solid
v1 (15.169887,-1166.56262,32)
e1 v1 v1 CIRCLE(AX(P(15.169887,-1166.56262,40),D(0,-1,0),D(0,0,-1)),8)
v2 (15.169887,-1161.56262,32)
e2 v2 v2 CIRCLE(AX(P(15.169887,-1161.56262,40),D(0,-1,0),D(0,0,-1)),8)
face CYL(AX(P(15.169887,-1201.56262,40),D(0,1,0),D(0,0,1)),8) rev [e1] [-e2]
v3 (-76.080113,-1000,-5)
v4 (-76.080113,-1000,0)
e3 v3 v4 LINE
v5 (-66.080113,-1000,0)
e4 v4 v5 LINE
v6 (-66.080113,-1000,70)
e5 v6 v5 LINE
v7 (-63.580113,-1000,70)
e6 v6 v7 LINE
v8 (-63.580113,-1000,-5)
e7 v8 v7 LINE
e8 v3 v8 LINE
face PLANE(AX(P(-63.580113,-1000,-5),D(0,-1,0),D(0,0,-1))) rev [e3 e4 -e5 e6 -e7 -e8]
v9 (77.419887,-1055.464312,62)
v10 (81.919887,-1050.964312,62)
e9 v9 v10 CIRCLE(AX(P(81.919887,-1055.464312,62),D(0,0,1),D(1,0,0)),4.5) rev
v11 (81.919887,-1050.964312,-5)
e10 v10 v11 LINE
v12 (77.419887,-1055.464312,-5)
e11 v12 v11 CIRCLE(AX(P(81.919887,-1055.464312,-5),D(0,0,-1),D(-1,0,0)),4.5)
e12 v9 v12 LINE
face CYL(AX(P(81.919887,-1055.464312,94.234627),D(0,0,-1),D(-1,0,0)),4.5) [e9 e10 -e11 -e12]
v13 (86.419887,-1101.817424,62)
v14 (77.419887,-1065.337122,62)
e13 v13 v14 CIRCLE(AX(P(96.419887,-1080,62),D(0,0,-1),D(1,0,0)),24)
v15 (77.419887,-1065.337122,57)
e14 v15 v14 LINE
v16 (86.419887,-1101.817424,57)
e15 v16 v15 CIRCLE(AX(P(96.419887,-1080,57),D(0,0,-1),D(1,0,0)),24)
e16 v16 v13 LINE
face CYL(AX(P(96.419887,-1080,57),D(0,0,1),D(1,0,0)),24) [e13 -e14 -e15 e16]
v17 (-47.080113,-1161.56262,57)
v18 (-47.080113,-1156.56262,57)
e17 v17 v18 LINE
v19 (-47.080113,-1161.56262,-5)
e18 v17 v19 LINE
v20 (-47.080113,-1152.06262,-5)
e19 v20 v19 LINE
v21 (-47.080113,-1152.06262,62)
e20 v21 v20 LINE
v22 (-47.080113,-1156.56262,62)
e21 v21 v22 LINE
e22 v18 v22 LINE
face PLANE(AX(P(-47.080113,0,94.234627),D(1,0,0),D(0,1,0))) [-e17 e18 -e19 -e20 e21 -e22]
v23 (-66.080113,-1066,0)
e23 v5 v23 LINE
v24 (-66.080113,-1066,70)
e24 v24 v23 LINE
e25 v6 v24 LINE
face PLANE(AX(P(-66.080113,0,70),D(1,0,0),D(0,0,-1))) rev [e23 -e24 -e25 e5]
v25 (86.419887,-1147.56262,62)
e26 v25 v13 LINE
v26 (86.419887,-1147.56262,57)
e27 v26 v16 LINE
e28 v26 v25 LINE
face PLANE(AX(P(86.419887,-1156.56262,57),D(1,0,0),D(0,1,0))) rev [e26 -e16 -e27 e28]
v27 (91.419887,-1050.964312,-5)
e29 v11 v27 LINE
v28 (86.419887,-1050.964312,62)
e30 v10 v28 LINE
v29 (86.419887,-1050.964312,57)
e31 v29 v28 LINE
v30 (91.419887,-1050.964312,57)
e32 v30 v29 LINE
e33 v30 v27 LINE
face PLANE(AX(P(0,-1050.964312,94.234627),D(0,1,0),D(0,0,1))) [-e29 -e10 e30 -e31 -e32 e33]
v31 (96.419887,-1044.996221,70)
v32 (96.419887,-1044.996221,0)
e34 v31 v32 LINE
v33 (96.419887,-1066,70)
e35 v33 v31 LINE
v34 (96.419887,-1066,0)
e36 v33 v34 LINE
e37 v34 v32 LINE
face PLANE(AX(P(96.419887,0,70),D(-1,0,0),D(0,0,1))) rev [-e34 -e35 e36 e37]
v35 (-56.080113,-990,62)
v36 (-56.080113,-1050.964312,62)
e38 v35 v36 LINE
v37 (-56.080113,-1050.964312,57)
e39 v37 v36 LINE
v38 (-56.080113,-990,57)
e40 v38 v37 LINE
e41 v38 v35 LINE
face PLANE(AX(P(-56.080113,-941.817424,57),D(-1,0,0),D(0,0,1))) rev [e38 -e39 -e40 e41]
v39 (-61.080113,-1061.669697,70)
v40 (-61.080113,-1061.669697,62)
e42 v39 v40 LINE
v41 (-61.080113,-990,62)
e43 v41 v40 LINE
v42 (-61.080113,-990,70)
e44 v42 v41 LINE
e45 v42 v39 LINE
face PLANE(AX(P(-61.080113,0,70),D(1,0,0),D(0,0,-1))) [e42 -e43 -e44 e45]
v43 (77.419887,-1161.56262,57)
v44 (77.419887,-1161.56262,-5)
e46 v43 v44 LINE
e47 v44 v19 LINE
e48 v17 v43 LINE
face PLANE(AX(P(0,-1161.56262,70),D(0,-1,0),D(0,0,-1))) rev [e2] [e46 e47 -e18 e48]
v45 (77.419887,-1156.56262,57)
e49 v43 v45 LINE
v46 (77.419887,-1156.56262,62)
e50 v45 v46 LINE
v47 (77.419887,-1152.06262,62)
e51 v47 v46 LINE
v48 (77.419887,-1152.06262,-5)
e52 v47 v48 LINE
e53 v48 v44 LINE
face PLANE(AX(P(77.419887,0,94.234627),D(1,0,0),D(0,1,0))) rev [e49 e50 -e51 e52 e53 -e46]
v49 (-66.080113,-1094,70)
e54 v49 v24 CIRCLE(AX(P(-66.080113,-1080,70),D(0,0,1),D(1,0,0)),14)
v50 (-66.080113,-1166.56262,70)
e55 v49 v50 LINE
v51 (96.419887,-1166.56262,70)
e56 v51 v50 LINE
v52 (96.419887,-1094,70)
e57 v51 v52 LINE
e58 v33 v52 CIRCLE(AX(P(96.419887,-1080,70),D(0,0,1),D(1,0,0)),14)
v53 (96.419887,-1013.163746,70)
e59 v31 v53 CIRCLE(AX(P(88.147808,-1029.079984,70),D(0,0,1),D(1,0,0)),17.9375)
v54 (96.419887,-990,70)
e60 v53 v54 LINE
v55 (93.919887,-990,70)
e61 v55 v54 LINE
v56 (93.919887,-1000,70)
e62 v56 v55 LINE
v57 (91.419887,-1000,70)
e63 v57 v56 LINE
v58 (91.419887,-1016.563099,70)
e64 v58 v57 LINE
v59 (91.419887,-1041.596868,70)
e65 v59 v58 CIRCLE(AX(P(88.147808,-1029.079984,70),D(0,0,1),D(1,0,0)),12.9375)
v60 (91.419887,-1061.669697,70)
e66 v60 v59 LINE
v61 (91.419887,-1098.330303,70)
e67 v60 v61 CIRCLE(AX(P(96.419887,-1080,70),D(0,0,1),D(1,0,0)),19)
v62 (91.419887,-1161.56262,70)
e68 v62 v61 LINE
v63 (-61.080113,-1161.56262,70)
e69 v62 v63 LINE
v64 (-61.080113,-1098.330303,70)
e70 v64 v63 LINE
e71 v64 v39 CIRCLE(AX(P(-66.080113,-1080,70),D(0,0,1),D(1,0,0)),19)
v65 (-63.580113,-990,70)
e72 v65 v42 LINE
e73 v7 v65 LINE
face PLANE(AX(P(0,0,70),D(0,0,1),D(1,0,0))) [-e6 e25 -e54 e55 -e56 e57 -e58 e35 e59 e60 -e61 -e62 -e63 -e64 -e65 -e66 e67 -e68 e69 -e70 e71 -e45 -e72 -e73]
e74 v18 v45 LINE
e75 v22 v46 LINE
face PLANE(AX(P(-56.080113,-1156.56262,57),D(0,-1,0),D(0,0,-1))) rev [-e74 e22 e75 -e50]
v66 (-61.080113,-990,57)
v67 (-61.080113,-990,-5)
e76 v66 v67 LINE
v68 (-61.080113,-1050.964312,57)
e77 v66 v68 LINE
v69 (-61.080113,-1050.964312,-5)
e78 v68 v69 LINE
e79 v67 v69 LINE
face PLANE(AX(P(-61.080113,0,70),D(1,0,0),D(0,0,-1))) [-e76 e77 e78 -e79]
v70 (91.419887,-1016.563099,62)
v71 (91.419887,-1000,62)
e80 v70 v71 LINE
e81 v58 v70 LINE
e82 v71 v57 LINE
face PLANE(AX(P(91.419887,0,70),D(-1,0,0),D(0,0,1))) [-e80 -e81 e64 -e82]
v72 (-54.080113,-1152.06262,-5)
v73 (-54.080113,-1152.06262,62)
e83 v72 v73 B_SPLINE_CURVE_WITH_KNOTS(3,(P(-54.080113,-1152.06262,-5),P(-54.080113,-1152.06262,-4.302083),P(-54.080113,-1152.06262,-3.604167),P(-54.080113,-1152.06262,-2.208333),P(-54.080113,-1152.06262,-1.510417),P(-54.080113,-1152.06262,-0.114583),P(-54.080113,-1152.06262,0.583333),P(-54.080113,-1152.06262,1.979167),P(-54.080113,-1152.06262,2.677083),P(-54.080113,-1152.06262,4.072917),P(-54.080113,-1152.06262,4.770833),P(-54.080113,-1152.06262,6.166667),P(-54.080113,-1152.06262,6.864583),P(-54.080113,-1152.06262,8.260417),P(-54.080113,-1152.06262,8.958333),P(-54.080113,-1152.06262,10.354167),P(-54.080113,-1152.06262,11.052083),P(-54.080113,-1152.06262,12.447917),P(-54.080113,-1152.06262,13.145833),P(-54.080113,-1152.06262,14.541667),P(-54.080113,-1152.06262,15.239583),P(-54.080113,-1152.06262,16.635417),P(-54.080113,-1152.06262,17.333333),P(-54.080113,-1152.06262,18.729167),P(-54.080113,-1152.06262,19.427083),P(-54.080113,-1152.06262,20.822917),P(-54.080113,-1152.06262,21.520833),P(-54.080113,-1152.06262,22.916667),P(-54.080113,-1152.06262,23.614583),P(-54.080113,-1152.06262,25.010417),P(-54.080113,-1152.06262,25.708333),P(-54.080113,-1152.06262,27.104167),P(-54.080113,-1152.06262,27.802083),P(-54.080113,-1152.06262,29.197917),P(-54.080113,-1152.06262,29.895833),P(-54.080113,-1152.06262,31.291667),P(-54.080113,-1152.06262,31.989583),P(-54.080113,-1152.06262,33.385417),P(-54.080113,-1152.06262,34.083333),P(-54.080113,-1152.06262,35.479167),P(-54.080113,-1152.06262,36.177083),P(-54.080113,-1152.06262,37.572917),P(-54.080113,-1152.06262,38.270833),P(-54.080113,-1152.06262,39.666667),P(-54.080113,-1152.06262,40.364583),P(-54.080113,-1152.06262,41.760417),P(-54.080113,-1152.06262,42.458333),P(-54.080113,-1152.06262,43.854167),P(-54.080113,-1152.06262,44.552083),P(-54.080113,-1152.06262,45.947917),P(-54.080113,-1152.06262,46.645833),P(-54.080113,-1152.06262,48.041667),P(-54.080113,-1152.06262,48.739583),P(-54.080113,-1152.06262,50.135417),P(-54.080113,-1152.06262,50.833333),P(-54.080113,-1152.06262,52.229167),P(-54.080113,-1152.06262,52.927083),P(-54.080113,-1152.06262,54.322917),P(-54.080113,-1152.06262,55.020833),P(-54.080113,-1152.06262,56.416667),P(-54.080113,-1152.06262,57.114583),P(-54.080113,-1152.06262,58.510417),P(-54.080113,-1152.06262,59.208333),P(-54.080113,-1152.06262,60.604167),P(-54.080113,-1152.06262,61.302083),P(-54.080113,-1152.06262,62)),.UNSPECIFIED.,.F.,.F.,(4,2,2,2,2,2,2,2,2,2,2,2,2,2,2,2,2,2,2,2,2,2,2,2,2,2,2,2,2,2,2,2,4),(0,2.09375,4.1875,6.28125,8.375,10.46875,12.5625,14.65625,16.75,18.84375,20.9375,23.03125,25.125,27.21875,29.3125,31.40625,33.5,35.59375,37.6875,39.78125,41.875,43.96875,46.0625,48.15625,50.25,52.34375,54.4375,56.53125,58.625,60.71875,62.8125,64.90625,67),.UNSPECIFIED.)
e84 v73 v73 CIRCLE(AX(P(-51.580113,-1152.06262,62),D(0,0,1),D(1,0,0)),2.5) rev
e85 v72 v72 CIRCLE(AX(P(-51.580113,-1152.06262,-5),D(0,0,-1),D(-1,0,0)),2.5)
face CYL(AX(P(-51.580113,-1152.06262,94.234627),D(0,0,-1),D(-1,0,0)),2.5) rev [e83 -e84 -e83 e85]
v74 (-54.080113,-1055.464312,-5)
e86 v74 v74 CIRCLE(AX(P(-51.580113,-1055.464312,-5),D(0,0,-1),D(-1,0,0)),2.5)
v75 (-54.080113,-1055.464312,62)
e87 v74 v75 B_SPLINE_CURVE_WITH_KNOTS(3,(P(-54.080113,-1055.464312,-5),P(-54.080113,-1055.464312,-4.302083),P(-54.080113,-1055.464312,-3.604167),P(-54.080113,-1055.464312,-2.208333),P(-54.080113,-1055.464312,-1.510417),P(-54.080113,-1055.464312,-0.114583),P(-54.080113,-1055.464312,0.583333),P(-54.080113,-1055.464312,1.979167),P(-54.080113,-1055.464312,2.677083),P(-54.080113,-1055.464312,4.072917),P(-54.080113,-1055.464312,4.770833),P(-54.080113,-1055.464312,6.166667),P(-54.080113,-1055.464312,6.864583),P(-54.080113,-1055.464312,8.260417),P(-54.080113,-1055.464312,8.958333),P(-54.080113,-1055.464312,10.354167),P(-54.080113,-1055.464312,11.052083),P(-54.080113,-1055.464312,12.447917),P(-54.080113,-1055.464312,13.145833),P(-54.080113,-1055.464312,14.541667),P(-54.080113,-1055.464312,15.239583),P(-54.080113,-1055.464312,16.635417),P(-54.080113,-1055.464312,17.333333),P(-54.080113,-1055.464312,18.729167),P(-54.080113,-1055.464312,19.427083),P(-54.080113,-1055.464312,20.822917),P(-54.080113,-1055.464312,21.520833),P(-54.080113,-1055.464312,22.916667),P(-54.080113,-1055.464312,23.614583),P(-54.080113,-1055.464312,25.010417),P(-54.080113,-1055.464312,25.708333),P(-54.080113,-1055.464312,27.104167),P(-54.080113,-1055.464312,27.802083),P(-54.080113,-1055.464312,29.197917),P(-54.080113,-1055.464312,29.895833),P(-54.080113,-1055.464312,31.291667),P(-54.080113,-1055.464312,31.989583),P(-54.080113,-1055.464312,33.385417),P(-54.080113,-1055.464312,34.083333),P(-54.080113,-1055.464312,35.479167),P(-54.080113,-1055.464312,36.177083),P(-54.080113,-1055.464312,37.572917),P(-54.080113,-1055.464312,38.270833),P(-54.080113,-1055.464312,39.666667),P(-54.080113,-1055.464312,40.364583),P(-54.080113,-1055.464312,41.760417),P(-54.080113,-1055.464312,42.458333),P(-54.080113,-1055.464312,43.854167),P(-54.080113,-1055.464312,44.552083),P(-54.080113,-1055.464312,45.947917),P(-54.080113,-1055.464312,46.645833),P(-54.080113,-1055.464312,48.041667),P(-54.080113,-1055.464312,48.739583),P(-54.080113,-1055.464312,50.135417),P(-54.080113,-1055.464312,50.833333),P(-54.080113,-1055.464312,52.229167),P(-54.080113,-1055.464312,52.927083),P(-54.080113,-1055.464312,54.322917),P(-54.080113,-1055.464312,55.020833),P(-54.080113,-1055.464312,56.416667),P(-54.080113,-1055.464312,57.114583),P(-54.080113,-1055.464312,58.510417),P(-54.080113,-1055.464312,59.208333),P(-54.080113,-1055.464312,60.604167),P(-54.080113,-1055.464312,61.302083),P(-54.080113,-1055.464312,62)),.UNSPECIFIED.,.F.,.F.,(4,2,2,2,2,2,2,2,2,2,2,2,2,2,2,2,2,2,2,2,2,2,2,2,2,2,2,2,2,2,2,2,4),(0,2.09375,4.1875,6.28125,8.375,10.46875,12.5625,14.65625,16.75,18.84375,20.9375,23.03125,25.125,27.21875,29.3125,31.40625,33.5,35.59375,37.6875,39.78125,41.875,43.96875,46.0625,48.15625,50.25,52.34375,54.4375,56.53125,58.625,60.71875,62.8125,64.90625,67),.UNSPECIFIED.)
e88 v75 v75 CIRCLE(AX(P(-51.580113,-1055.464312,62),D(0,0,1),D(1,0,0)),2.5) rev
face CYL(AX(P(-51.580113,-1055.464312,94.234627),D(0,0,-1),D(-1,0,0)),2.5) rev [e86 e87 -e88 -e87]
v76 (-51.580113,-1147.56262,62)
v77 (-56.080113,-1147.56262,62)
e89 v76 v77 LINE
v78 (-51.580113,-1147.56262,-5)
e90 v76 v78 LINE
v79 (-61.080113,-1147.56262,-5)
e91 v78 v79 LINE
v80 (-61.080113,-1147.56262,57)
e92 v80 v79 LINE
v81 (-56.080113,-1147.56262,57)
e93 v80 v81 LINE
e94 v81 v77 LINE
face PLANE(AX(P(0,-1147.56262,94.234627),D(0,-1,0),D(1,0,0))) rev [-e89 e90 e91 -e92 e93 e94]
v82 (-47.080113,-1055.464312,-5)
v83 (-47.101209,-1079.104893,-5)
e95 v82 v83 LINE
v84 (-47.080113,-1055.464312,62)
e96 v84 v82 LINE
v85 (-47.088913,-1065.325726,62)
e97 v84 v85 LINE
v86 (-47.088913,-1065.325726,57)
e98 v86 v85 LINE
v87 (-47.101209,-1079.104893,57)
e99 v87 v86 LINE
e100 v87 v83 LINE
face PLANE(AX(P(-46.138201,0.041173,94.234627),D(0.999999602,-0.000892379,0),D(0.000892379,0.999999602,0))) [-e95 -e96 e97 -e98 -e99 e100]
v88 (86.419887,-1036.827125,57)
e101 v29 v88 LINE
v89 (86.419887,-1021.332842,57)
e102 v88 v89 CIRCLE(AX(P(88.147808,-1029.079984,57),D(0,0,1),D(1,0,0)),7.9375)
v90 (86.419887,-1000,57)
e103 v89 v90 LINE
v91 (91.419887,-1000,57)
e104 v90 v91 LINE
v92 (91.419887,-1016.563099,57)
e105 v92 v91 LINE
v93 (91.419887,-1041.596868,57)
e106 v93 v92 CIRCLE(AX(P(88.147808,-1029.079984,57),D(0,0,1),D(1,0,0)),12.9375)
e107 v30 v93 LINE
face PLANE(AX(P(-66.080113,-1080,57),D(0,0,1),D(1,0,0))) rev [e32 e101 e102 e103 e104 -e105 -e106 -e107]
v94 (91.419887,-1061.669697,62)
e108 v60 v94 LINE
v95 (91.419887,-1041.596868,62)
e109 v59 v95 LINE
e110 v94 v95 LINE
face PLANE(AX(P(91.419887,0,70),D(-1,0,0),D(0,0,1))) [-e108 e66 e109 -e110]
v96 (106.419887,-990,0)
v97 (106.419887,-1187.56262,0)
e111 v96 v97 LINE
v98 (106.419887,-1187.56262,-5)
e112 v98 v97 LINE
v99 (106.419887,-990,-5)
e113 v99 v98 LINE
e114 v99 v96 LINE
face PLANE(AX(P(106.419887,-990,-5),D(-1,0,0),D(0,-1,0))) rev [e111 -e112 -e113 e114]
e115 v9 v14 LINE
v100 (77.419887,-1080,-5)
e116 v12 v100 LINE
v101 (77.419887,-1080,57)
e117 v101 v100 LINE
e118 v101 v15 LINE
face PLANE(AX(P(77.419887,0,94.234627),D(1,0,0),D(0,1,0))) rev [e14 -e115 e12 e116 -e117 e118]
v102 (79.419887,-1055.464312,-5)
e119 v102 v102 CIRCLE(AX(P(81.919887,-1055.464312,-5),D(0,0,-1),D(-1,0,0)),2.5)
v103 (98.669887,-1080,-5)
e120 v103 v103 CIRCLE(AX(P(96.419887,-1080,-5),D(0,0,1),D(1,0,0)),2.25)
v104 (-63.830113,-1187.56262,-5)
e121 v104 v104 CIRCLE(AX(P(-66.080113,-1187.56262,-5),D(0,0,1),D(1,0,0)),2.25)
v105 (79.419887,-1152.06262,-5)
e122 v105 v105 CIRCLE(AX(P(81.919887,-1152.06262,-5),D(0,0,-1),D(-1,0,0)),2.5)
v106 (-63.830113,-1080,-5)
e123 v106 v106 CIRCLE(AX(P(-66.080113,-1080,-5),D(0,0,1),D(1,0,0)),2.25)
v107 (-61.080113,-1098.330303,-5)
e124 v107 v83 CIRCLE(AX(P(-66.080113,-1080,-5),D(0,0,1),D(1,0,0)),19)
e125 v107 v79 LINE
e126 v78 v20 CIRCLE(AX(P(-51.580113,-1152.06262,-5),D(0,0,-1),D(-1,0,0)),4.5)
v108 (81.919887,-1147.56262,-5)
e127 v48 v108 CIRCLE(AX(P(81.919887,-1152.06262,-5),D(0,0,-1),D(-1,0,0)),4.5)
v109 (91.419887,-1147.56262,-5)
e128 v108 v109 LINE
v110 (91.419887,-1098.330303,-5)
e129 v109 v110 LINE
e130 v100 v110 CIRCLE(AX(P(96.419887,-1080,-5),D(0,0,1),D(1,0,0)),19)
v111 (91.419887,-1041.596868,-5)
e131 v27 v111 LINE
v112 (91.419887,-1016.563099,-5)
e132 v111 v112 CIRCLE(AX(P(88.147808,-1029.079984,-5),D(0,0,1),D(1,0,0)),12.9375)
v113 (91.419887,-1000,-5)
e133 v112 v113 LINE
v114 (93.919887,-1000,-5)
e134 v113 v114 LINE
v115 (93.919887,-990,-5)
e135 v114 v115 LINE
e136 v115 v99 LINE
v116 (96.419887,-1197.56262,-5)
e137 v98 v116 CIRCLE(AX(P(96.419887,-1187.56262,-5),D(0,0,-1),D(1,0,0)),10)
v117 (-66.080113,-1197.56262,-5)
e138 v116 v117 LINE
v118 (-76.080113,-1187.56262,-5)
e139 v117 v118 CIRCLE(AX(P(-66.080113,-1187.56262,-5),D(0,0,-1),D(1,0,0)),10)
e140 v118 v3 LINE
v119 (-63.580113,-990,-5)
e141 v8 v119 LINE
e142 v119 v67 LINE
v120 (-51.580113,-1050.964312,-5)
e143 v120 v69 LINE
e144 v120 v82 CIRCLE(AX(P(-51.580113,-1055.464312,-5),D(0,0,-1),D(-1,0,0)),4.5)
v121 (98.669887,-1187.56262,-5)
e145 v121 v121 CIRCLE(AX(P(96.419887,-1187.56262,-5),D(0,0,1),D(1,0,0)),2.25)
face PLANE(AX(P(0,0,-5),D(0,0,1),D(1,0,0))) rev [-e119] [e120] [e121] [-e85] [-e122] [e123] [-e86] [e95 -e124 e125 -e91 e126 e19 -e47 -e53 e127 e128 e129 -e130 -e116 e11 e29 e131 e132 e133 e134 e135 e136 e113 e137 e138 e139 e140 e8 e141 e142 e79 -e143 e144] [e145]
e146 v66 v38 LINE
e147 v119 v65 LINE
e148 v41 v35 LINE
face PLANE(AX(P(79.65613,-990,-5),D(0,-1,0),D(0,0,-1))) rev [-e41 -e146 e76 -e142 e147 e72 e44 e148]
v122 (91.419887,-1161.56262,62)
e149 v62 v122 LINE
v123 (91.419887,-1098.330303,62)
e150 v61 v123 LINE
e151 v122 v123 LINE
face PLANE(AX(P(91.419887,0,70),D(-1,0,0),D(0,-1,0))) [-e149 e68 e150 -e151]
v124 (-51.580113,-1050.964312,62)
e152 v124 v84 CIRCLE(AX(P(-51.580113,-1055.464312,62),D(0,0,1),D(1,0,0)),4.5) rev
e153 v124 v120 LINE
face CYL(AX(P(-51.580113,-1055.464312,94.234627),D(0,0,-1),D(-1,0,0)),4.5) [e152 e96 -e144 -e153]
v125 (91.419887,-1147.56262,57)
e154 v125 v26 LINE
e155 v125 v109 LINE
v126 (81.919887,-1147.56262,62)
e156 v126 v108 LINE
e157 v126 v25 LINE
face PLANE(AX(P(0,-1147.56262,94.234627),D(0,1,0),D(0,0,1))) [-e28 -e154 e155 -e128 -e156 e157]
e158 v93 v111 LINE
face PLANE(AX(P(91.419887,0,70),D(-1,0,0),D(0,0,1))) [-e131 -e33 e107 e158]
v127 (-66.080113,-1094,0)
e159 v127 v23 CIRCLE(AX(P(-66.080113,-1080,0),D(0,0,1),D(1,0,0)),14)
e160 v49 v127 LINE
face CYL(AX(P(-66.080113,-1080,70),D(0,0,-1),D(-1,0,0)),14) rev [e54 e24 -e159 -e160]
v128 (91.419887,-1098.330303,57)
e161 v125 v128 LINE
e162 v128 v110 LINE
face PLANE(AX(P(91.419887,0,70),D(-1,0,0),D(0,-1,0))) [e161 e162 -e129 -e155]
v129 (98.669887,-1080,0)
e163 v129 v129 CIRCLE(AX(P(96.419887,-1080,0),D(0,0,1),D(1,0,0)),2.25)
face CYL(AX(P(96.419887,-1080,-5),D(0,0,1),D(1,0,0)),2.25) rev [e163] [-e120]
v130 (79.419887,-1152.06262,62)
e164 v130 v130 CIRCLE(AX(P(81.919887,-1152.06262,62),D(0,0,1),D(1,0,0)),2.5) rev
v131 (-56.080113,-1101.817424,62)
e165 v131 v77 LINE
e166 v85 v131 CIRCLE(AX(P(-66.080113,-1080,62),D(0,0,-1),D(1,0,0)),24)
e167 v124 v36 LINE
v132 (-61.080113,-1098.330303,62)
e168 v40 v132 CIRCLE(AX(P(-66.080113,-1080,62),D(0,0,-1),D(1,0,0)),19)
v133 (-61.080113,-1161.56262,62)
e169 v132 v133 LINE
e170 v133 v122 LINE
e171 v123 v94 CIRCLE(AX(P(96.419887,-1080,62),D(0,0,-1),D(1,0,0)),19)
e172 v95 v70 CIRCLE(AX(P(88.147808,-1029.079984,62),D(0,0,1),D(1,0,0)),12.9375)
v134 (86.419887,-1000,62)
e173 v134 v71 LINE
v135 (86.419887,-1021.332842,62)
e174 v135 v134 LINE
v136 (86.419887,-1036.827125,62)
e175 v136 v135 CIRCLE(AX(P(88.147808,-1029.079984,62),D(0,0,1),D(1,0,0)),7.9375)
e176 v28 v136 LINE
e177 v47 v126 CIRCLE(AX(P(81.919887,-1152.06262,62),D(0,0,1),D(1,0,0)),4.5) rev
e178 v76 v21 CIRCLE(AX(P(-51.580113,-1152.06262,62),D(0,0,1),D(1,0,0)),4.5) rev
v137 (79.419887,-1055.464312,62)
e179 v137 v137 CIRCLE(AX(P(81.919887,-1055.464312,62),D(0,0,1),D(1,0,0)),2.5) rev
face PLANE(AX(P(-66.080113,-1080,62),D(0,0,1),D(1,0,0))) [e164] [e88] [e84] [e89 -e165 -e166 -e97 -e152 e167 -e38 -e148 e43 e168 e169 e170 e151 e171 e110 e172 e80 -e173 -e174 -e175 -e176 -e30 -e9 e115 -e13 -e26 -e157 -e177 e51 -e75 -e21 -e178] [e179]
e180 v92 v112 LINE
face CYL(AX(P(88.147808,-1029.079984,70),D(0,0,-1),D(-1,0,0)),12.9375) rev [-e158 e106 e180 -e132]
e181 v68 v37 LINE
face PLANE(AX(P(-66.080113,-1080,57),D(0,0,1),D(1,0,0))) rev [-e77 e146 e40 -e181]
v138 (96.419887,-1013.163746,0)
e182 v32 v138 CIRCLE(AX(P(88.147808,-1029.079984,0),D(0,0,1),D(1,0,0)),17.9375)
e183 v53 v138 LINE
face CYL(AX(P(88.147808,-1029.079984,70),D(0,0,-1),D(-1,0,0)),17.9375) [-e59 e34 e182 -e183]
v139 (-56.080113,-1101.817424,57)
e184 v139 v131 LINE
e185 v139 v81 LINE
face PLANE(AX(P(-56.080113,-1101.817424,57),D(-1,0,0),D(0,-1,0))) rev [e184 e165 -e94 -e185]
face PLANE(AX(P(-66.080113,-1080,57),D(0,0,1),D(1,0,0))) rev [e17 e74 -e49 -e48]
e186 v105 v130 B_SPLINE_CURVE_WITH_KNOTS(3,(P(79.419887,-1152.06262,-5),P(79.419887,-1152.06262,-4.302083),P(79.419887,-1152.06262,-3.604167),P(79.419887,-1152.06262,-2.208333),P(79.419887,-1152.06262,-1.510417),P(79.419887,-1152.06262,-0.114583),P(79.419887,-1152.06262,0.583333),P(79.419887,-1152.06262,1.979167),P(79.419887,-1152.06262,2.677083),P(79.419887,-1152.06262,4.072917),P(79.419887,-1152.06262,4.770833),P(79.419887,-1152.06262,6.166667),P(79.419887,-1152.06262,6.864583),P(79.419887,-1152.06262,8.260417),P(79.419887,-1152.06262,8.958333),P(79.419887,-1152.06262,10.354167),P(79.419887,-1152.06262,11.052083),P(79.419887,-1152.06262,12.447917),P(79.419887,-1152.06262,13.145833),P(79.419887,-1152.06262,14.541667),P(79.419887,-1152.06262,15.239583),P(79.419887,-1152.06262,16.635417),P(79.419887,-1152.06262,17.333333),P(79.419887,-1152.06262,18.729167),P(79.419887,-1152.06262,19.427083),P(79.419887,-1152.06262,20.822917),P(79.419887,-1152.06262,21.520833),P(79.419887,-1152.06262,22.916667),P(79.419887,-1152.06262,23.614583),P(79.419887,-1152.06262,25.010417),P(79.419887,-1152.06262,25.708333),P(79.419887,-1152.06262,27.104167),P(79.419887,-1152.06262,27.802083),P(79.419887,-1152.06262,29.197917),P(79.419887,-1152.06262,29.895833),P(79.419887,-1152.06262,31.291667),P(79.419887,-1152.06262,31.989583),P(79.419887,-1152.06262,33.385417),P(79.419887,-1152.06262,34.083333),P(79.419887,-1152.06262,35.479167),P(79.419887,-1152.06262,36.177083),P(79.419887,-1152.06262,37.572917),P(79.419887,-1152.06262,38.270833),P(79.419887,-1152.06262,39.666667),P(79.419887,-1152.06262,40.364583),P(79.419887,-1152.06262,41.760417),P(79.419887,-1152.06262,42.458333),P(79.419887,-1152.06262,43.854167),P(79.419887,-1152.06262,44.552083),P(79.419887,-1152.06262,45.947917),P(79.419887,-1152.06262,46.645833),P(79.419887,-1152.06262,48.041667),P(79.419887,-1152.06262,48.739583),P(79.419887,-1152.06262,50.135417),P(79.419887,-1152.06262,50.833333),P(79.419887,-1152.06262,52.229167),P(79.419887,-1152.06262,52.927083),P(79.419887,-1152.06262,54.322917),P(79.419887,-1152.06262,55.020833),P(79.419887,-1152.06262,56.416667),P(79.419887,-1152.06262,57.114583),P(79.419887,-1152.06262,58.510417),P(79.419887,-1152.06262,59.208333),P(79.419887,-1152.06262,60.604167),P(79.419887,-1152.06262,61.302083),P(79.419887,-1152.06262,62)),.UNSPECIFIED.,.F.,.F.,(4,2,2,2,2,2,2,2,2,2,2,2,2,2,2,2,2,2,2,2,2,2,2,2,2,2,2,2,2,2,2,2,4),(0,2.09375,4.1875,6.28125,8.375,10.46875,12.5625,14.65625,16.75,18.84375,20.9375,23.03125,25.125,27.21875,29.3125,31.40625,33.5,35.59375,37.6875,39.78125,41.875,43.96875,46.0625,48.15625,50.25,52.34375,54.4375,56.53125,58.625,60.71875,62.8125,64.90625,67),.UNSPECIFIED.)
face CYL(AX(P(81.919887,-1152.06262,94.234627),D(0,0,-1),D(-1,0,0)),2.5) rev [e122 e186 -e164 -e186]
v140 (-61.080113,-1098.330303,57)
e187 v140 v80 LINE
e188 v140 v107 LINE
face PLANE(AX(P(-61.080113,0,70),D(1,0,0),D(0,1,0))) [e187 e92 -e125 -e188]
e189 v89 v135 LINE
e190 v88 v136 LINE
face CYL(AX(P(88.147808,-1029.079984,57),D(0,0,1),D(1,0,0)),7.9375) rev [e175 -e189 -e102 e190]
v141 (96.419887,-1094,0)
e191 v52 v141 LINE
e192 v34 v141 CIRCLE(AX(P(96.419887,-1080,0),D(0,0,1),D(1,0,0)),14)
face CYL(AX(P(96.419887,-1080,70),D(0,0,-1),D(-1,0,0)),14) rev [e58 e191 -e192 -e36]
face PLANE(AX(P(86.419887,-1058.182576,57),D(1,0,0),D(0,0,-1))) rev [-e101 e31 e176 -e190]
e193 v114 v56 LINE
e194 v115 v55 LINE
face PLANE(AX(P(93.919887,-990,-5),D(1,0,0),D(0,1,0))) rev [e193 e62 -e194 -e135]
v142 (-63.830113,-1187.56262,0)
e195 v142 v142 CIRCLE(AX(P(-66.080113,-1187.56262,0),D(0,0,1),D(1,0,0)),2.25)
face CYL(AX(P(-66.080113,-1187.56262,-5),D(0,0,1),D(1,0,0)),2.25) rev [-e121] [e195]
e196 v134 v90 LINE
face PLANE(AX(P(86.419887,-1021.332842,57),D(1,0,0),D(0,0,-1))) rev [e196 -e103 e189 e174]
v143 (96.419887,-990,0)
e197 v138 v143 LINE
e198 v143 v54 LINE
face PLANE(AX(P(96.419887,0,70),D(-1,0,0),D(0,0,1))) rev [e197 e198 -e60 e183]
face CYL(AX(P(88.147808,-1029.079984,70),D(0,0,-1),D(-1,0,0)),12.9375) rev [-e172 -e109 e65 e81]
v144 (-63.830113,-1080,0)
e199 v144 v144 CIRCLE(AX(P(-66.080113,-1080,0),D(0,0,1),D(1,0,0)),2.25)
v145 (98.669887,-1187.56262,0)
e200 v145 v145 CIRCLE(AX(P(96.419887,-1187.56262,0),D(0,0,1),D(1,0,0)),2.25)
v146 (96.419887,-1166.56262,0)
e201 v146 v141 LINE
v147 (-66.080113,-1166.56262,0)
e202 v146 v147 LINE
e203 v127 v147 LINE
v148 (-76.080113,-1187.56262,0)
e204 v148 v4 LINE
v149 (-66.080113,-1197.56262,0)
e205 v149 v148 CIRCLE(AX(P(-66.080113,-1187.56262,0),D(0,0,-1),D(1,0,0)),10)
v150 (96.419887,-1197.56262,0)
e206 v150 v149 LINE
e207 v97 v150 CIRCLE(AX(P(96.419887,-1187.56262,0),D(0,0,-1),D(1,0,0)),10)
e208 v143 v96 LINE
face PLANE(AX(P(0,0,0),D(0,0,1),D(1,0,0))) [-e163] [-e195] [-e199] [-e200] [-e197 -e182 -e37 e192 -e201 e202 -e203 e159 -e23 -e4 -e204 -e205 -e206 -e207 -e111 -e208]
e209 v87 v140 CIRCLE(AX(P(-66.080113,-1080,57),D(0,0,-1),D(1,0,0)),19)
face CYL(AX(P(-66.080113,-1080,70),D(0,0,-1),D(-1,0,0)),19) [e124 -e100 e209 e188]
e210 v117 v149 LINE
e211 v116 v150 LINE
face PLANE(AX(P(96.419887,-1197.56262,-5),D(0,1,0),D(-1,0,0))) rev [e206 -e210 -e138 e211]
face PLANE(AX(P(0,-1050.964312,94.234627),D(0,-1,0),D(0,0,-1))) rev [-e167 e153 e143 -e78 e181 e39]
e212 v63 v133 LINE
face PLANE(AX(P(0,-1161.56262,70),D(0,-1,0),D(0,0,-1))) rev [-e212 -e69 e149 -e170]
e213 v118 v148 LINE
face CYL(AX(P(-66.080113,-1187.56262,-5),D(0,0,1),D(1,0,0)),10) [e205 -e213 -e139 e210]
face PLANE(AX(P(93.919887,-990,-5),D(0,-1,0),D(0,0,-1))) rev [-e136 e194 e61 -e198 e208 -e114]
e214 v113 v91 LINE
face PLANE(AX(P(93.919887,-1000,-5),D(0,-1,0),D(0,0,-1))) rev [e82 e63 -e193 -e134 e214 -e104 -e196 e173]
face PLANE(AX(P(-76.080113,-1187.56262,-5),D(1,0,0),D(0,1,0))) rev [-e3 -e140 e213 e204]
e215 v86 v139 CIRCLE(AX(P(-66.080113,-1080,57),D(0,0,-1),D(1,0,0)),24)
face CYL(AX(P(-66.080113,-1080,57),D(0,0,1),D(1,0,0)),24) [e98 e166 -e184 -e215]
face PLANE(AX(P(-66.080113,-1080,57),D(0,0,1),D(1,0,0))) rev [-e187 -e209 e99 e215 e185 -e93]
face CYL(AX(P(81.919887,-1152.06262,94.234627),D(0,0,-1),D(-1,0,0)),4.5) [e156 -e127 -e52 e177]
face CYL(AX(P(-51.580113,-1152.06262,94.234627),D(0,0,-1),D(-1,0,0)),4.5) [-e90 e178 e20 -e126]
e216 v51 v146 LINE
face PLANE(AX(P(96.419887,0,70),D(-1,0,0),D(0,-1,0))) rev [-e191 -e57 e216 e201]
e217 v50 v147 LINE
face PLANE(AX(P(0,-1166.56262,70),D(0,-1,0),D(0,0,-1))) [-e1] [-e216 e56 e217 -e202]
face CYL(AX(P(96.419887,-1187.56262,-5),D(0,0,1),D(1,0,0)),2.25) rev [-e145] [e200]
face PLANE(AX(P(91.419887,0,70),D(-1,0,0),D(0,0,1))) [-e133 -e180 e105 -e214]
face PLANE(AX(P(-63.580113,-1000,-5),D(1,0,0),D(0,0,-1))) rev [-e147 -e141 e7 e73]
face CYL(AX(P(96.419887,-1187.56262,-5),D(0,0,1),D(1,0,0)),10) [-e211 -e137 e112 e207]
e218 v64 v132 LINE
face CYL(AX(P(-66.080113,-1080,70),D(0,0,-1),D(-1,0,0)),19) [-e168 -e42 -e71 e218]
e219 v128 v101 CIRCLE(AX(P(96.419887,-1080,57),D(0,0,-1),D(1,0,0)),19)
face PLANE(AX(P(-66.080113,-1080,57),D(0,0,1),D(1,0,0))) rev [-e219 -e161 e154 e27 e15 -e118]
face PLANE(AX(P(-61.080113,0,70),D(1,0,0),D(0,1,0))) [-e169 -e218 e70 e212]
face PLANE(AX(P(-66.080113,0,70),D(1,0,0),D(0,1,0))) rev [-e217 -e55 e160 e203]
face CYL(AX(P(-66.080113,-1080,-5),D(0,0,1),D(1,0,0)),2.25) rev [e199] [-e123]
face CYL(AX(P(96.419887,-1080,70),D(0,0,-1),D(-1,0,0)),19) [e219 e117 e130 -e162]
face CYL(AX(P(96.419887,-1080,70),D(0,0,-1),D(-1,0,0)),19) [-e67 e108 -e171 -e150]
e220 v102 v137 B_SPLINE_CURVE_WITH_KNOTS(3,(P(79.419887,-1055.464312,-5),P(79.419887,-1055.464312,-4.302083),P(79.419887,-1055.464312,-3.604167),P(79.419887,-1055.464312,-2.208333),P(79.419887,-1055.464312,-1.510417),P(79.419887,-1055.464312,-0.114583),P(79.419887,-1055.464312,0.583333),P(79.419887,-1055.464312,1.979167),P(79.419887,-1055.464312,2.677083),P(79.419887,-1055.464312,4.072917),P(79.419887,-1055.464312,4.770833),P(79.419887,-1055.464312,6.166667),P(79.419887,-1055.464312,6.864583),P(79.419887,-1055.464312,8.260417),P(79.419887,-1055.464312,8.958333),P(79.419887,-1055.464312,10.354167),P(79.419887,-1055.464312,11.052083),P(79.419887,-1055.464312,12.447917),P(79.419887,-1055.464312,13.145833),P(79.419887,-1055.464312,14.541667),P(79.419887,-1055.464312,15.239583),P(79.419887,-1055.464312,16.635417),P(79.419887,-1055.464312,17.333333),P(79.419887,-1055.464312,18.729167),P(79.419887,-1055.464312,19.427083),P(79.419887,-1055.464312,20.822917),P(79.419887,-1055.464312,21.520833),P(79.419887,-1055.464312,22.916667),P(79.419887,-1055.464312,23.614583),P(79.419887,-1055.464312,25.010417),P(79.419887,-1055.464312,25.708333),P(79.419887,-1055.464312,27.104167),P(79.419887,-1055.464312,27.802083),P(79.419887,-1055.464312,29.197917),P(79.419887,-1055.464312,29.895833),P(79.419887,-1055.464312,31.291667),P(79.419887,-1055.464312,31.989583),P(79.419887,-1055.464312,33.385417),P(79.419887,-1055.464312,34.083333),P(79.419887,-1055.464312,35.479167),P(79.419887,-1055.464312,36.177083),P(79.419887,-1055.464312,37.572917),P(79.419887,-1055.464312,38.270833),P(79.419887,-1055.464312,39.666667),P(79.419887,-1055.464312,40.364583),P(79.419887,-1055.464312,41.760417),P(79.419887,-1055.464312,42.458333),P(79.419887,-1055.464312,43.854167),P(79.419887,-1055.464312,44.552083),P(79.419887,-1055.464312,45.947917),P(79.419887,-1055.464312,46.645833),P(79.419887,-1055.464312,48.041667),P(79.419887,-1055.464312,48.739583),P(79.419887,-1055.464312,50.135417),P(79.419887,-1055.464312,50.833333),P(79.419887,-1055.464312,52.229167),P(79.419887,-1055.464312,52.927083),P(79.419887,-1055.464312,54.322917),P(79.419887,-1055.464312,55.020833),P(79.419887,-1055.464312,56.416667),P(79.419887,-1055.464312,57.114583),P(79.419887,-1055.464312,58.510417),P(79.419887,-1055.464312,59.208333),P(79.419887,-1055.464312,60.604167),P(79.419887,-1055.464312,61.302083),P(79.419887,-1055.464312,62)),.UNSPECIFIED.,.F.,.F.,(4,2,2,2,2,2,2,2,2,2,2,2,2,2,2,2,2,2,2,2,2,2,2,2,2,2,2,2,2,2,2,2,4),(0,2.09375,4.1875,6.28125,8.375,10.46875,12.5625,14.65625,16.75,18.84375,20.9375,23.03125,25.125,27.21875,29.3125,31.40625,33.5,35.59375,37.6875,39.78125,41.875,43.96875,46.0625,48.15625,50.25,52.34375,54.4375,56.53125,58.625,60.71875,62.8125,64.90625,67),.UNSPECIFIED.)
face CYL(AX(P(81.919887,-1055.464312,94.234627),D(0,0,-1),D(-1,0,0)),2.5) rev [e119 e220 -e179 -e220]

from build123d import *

# Parameters (mm, degrees)
SKETCH1_R               = 2.25
SKETCH1_R_2             = 7.9375
BOSS_EXTRUDE1_DEPTH     = 5
BOSS_EXTRUDE2_DEPTH     = 70
SKETCH3_R               = 8
CUT_EXTRUDE1_DEPTH      = 398.254952325
CUT_EXTRUDE2_DEPTH      = 1209.654326614
SKETCH5_R               = 7.9375
CUT_EXTRUDE3_DEPTH      = 1209.654326614
BOSS_EXTRUDE4_DEPTH     = 5
BOSS_EXTRUDE5_START     = -67
BOSS_EXTRUDE5_OUTLINE_R = 2.5
BOSS_EXTRUDE5_DEPTH     = 67
CUT_EXTRUDE4_DEPTH      = 1209.654326614
CUT_EXTRUDE4_DEPTH_BACK = 1209.654326614
CUT_EXTRUDE5_DEPTH      = 1209.654326614


# Read off the part's stored shape, not the designer's step: Boss-Extrude5
with BuildPart() as part:
    # Sketch1 → Boss-Extrude1 (new body)
    with BuildSketch(Plane.XY):
        with BuildLine():
            Line((-66.080112923, -1201.56262), (96.419887077, -1201.56262))
            ThreePointArc((96.419887077, -1201.56262), (106.319382013, -1197.462114937), (110.419887077, -1187.56262))
            Line((110.419887077, -1187.56262), (110.419887077, -812.43738))
            ThreePointArc((110.419887077, -812.43738), (106.319382013, -802.537885063), (96.419887077, -798.43738))
            Line((96.419887077, -798.43738), (-66.080112923, -798.43738))
            ThreePointArc((-66.080112923, -798.43738), (-75.97960786, -802.537885063), (-80.080112923, -812.43738))
            Line((-80.080112923, -812.43738), (-80.080112923, -1187.56262))
            ThreePointArc((-80.080112923, -1187.56262), (-75.97960786, -1197.462114937), (-66.080112923, -1201.56262))
        make_face()
        with Locations((96.419887077, -1080)):
            Circle(SKETCH1_R, mode=Mode.SUBTRACT)
        with Locations((88.147808187, -1029.0799835)):
            Circle(SKETCH1_R_2, mode=Mode.SUBTRACT)
        with Locations((-66.080112923, -1080)):
            Circle(SKETCH1_R, mode=Mode.SUBTRACT)
        with Locations((96.419887077, -920)):
            Circle(SKETCH1_R, mode=Mode.SUBTRACT)
        with Locations((-66.080112923, -920)):
            Circle(SKETCH1_R, mode=Mode.SUBTRACT)
        with Locations((-66.080112923, -1187.56262)):
            Circle(SKETCH1_R, mode=Mode.SUBTRACT)
        with Locations((96.419887077, -1187.56262)):
            Circle(SKETCH1_R, mode=Mode.SUBTRACT)
        with Locations((-66.080112923, -812.43738)):
            Circle(SKETCH1_R, mode=Mode.SUBTRACT)
        with Locations((96.419887077, -812.43738)):
            Circle(SKETCH1_R, mode=Mode.SUBTRACT)
    extrude(amount=-BOSS_EXTRUDE1_DEPTH)

    # Sketch2 → Boss-Extrude2 (add)
    with BuildSketch(Plane.XY):
        with BuildLine():
            Line((91.419887077, -1166.56262), (96.419887077, -1166.56262))
            Line((96.419887077, -1166.56262), (96.419887077, -1099))
            Line((96.419887077, -1099), (96.419887077, -1094))
            ThreePointArc((96.419887077, -1094), (82.419887077, -1080), (96.419887077, -1066))
            Line((96.419887077, -1066), (96.419887077, -1061))
            Line((96.419887077, -1061), (96.419887077, -1044.996221029))
            ThreePointArc((96.419887077, -1044.996221029), (106.085308187, -1029.0799835), (96.419887077, -1013.163745971))
            Line((96.419887077, -1013.163745971), (96.419887077, -939))
            Line((96.419887077, -939), (96.419887077, -934))
            ThreePointArc((96.419887077, -934), (82.419887077, -920), (96.419887077, -906))
            Line((96.419887077, -906), (96.419887077, -901))
            Line((96.419887077, -901), (96.419887077, -833.43738))
            Line((96.419887077, -833.43738), (91.419887077, -833.43738))
            Line((91.419887077, -833.43738), (-61.080112923, -833.43738))
            Line((-61.080112923, -833.43738), (-66.080112923, -833.43738))
            Line((-66.080112923, -833.43738), (-66.080112923, -901))
            Line((-66.080112923, -901), (-66.080112923, -906))
            ThreePointArc((-66.080112923, -906), (-56.180617987, -910.100505063), (-52.080112923, -920))
            ThreePointArc((-52.080112923, -920), (-56.180617987, -929.899494937), (-66.080112923, -934))
            Line((-66.080112923, -934), (-66.080112923, -939))
            Line((-66.080112923, -939), (-66.080112923, -1061))
            Line((-66.080112923, -1061), (-66.080112923, -1066))
            ThreePointArc((-66.080112923, -1066), (-56.180617987, -1070.100505063), (-52.080112923, -1080))
            ThreePointArc((-52.080112923, -1080), (-56.180617987, -1089.899494937), (-66.080112923, -1094))
            Line((-66.080112923, -1094), (-66.080112923, -1099))
            Line((-66.080112923, -1099), (-66.080112923, -1166.56262))
            Line((-66.080112923, -1166.56262), (-61.080112923, -1166.56262))
            Line((-61.080112923, -1166.56262), (91.419887077, -1166.56262))
        make_face()
        with BuildLine():
            Line((91.419887077, -1098.33030278), (91.419887077, -1161.56262))
            Line((91.419887077, -1161.56262), (-61.080112923, -1161.56262))
            Line((-61.080112923, -1161.56262), (-61.080112923, -1098.33030278))
            ThreePointArc((-61.080112923, -1098.33030278), (-47.080112923, -1080), (-61.080112923, -1061.66969722))
            Line((-61.080112923, -1061.66969722), (-61.080112923, -938.33030278))
            ThreePointArc((-61.080112923, -938.33030278), (-47.080112923, -920), (-61.080112923, -901.66969722))
            Line((-61.080112923, -901.66969722), (-61.080112923, -838.43738))
            Line((-61.080112923, -838.43738), (91.419887077, -838.43738))
            Line((91.419887077, -838.43738), (91.419887077, -901.66969722))
            ThreePointArc((91.419887077, -901.66969722), (77.419887077, -920), (91.419887077, -938.33030278))
            Line((91.419887077, -938.33030278), (91.419887077, -1011.443447389))
            Line((91.419887077, -1011.443447389), (91.419887077, -1016.563098664))
            ThreePointArc((91.419887077, -1016.563098664), (94.061132369, -1017.572963757), (96.419887077, -1019.132540759))
            ThreePointArc((96.419887077, -1019.132540759), (99.861025654, -1023.586401535), (101.085308187, -1029.0799835))
            ThreePointArc((101.085308187, -1029.0799835), (99.861025654, -1034.573565465), (96.419887077, -1039.027426241))
            ThreePointArc((96.419887077, -1039.027426241), (94.061132369, -1040.587003243), (91.419887077, -1041.596868336))
            Line((91.419887077, -1041.596868336), (91.419887077, -1046.716519611))
            Line((91.419887077, -1046.716519611), (91.419887077, -1061.66969722))
            ThreePointArc((91.419887077, -1061.66969722), (77.419887077, -1080), (91.419887077, -1098.33030278))
        make_face(mode=Mode.SUBTRACT)
    extrude(amount=BOSS_EXTRUDE2_DEPTH)

    # Sketch3 → Cut-Extrude1 (cut, through all)
    with BuildSketch(Plane(origin=(0, -826.43738, 0), x_dir=(1, 0, 0), z_dir=(0, 1, 0))):
        with Locations(Location((15.169887077, -40, 0), (0, 0, 270))):
            Circle(SKETCH3_R)
    extrude(amount=-CUT_EXTRUDE1_DEPTH, mode=Mode.SUBTRACT)

    # Sketch4 → Cut-Extrude2 (cut, through all)
    with BuildSketch(Plane.XY):
        with BuildLine():
            Line((-61.080112923, -1161.56262), (91.419887077, -1161.56262))
            Line((91.419887077, -1161.56262), (91.419887077, -1098.33030278))
            ThreePointArc((91.419887077, -1098.33030278), (77.419887077, -1080), (91.419887077, -1061.66969722))
            Line((91.419887077, -1061.66969722), (91.419887077, -1046.716519611))
            ThreePointArc((91.419887077, -1046.716519611), (70.210308187, -1029.0799835), (91.419887077, -1011.443447389))
            Line((91.419887077, -1011.443447389), (91.419887077, -938.33030278))
            ThreePointArc((91.419887077, -938.33030278), (77.419887077, -920), (91.419887077, -901.66969722))
            Line((91.419887077, -901.66969722), (91.419887077, -838.43738))
            Line((91.419887077, -838.43738), (-61.080112923, -838.43738))
            Line((-61.080112923, -838.43738), (-61.080112923, -901.66969722))
            ThreePointArc((-61.080112923, -901.66969722), (-47.080112923, -920), (-61.080112923, -938.33030278))
            Line((-61.080112923, -938.33030278), (-61.080112923, -1061.66969722))
            ThreePointArc((-61.080112923, -1061.66969722), (-47.080112923, -1080), (-61.080112923, -1098.33030278))
            Line((-61.080112923, -1098.33030278), (-61.080112923, -1161.56262))
        make_face()
    extrude(amount=-CUT_EXTRUDE2_DEPTH, mode=Mode.SUBTRACT)

    # Sketch5 → Cut-Extrude3 (cut, through all)
    # profile 1 of 2: a face of its own
    with BuildSketch(Plane.XY):
        with BuildLine():
            ThreePointArc((101.085308187, -1029.0799835), (98.387716069, -1021.172822644), (91.419887077, -1016.563098664))
            ThreePointArc((91.419887077, -1016.563098664), (75.210308187, -1029.0799835), (91.419887077, -1041.596868336))
            ThreePointArc((91.419887077, -1041.596868336), (98.387716069, -1036.987144356), (101.085308187, -1029.0799835))
        make_face()
        with Locations((88.147808187, -1029.0799835)):
            Circle(SKETCH5_R, mode=Mode.SUBTRACT)
    # profile 2 of 2: a face of its own
    with BuildSketch(Plane.XY):
        with BuildLine():
            Line((91.419887077, -1016.563098664), (91.419887077, -1011.443447389))
            ThreePointArc((91.419887077, -1011.443447389), (70.210308187, -1029.0799835), (91.419887077, -1046.716519611))
            Line((91.419887077, -1046.716519611), (91.419887077, -1041.596868336))
            ThreePointArc((91.419887077, -1041.596868336), (75.210308187, -1029.0799835), (91.419887077, -1016.563098664))
        make_face()
    extrude(amount=-CUT_EXTRUDE3_DEPTH, mode=Mode.SUBTRACT)

    # Sketch9 → Boss-Extrude4 (add)
    with BuildSketch(Plane.XY.offset(62)):
        with BuildLine():
            Line((-61.080112923, -1098.33030278), (-61.080112923, -1161.56262))
            Line((-61.080112923, -1161.56262), (91.419887077, -1161.56262))
            Line((91.419887077, -1161.56262), (91.419887077, -1098.33030278))
            ThreePointArc((91.419887077, -1098.33030278), (77.419887077, -1080), (91.419887077, -1061.66969722))
            Line((91.419887077, -1061.66969722), (91.419887077, -1041.596868336))
            ThreePointArc((91.419887077, -1041.596868336), (101.085308187, -1029.0799835), (91.419887077, -1016.563098664))
            Line((91.419887077, -1016.563098664), (91.419887077, -938.33030278))
            ThreePointArc((91.419887077, -938.33030278), (77.419887077, -920), (91.419887077, -901.66969722))
            Line((91.419887077, -901.66969722), (91.419887077, -838.43738))
            Line((91.419887077, -838.43738), (-61.080112923, -838.43738))
            Line((-61.080112923, -838.43738), (-61.080112923, -901.66969722))
            ThreePointArc((-61.080112923, -901.66969722), (-47.080112923, -920), (-61.080112923, -938.33030278))
            Line((-61.080112923, -938.33030278), (-61.080112923, -1061.66969722))
            ThreePointArc((-61.080112923, -1061.66969722), (-47.080112923, -1080), (-61.080112923, -1098.33030278))
        make_face()
        with BuildLine():
            Line((86.419887077, -843.43738), (-56.080112923, -843.43738))
            Line((-56.080112923, -843.43738), (-56.080112923, -898.182575771))
            ThreePointArc((-56.080112923, -898.182575771), (-42.080112923, -920), (-56.080112923, -941.817424229))
            Line((-56.080112923, -941.817424229), (-56.080112923, -1058.182575771))
            ThreePointArc((-56.080112923, -1058.182575771), (-42.080112923, -1080), (-56.080112923, -1101.817424229))
            Line((-56.080112923, -1101.817424229), (-56.080112923, -1156.56262))
            Line((-56.080112923, -1156.56262), (86.419887077, -1156.56262))
            Line((86.419887077, -1156.56262), (86.419887077, -1101.817424229))
            ThreePointArc((86.419887077, -1101.817424229), (72.419887077, -1080), (86.419887077, -1058.182575771))
            Line((86.419887077, -1058.182575771), (86.419887077, -1036.827124578))
            ThreePointArc((86.419887077, -1036.827124578), (96.085308187, -1029.0799835), (86.419887077, -1021.332842422))
            Line((86.419887077, -1021.332842422), (86.419887077, -941.817424229))
            ThreePointArc((86.419887077, -941.817424229), (72.419887077, -920), (86.419887077, -898.182575771))
            Line((86.419887077, -898.182575771), (86.419887077, -843.43738))
        make_face(mode=Mode.SUBTRACT)
    extrude(amount=-BOSS_EXTRUDE4_DEPTH)

    # Boss-Extrude5 outline → Boss-Extrude5 (add)
    # profile 1 of 8: a face of its own
    with BuildSketch(Plane(origin=(0, 0, -5), x_dir=(-1, 0, 0), z_dir=(0, 0, -1)).offset(BOSS_EXTRUDE5_START)):
        with BuildLine():
            ThreePointArc((-77.419887077, -1152.06262), (-78.737906562, -1148.880639485), (-81.919887077, -1147.56262))
            Line((-81.919887077, -1147.56262), (-91.419887077, -1147.56262))
            Line((-91.419887077, -1147.56262), (-91.419887077, -1161.56262))
            Line((-91.419887077, -1161.56262), (-77.419887077, -1161.56262))
            Line((-77.419887077, -1161.56262), (-77.419887077, -1152.06262))
        make_face()
        with Locations((-81.919887077, -1152.06262)):
            Circle(BOSS_EXTRUDE5_OUTLINE_R, mode=Mode.SUBTRACT)
    # profile 2 of 8: a face of its own
    with BuildSketch(Plane(origin=(0, 0, -5), x_dir=(-1, 0, 0), z_dir=(0, 0, -1)).offset(BOSS_EXTRUDE5_START)):
        with BuildLine():
            Line((-81.919887077, -1050.964311707), (-91.419887077, -1050.964311707))
            Line((-91.419887077, -1050.964311707), (-91.419887077, -1061.66969722))
            ThreePointArc((-91.419887077, -1061.66969722), (-81.320218206, -1068.467437405), (-77.419887077, -1080))
            Line((-77.419887077, -1080), (-77.419887077, -1055.464311707))
            ThreePointArc((-77.419887077, -1055.464311707), (-78.737906561, -1052.282331191), (-81.919887077, -1050.964311707))
        make_face()
        with Locations((-81.919887077, -1055.464311707)):
            Circle(BOSS_EXTRUDE5_OUTLINE_R, mode=Mode.SUBTRACT)
    # profile 3 of 8: a face of its own
    with BuildSketch(Plane(origin=(0, 0, -5), x_dir=(-1, 0, 0), z_dir=(0, 0, -1)).offset(BOSS_EXTRUDE5_START)):
        with BuildLine():
            Line((61.080112923, -1147.56262), (51.580112923, -1147.56262))
            ThreePointArc((51.580112923, -1147.56262), (48.398132408, -1148.880639485), (47.080112923, -1152.06262))
            Line((47.080112923, -1152.06262), (47.080112923, -1161.56262))
            Line((47.080112923, -1161.56262), (61.080112923, -1161.56262))
            Line((61.080112923, -1161.56262), (61.080112923, -1147.56262))
        make_face()
        with Locations((51.580112923, -1152.06262)):
            Circle(BOSS_EXTRUDE5_OUTLINE_R, mode=Mode.SUBTRACT)
    # profile 4 of 8: a face of its own
    with BuildSketch(Plane(origin=(0, 0, -5), x_dir=(-1, 0, 0), z_dir=(0, 0, -1)).offset(BOSS_EXTRUDE5_START)):
        with BuildLine():
            Line((61.080112923, -1050.964311707), (51.580112923, -1050.964311707))
            ThreePointArc((51.580112923, -1050.964311707), (48.398132408, -1052.282331192), (47.080112923, -1055.464311707))
            Line((47.080112923, -1055.464311707), (47.101209294, -1079.104892724))
            ThreePointArc((47.101209294, -1079.104892724), (51.256366252, -1068.114860765), (61.080112923, -1061.66969722))
            Line((61.080112923, -1061.66969722), (61.080112923, -1050.964311707))
        make_face()
        with Locations((51.580112923, -1055.464311707)):
            Circle(BOSS_EXTRUDE5_OUTLINE_R, mode=Mode.SUBTRACT)
    # profile 5 of 8: a face of its own
    with BuildSketch(Plane(origin=(0, 0, -5), x_dir=(-1, 0, 0), z_dir=(0, 0, -1)).offset(BOSS_EXTRUDE5_START)):
        with BuildLine():
            Line((47.080112923, -920), (47.080112923, -944.535688293))
            ThreePointArc((47.080112923, -944.535688293), (48.398132408, -947.717668808), (51.580112923, -949.035688293))
            Line((51.580112923, -949.035688293), (61.080112923, -949.035688293))
            Line((61.080112923, -949.035688293), (61.080112923, -938.33030278))
            ThreePointArc((61.080112923, -938.33030278), (50.980444052, -931.532562595), (47.080112923, -920))
        make_face()
        with Locations((51.580112923, -944.535688293)):
            Circle(BOSS_EXTRUDE5_OUTLINE_R, mode=Mode.SUBTRACT)
    # profile 6 of 8: a face of its own
    with BuildSketch(Plane(origin=(0, 0, -5), x_dir=(-1, 0, 0), z_dir=(0, 0, -1)).offset(BOSS_EXTRUDE5_START)):
        with BuildLine():
            Line((47.080112923, -838.43738), (47.080112923, -847.93738))
            ThreePointArc((47.080112923, -847.93738), (48.398132408, -851.119360515), (51.580112923, -852.43738))
            Line((51.580112923, -852.43738), (61.080112923, -852.43738))
            Line((61.080112923, -852.43738), (61.080112923, -838.43738))
            Line((61.080112923, -838.43738), (47.080112923, -838.43738))
        make_face()
        with Locations((51.580112923, -847.93738)):
            Circle(BOSS_EXTRUDE5_OUTLINE_R, mode=Mode.SUBTRACT)
    # profile 7 of 8: a face of its own
    with BuildSketch(Plane(origin=(0, 0, -5), x_dir=(-1, 0, 0), z_dir=(0, 0, -1)).offset(BOSS_EXTRUDE5_START)):
        with BuildLine():
            Line((-91.419887077, -852.43738), (-81.919887077, -852.43738))
            ThreePointArc((-81.919887077, -852.43738), (-78.737906561, -851.119360516), (-77.419887077, -847.93738))
            Line((-77.419887077, -847.93738), (-77.419887077, -838.43738))
            Line((-77.419887077, -838.43738), (-91.419887077, -838.43738))
            Line((-91.419887077, -838.43738), (-91.419887077, -852.43738))
        make_face()
        with Locations((-81.919887077, -847.93738)):
            Circle(BOSS_EXTRUDE5_OUTLINE_R, mode=Mode.SUBTRACT)
    # profile 8 of 8: a face of its own
    with BuildSketch(Plane(origin=(0, 0, -5), x_dir=(-1, 0, 0), z_dir=(0, 0, -1)).offset(BOSS_EXTRUDE5_START)):
        with BuildLine():
            Line((-91.419887077, -949.035688293), (-81.919887077, -949.035688293))
            ThreePointArc((-81.919887077, -949.035688293), (-78.737906562, -947.717668808), (-77.419887077, -944.535688293))
            Line((-77.419887077, -944.535688293), (-77.419887077, -920))
            ThreePointArc((-77.419887077, -920), (-81.320218206, -931.532562595), (-91.419887077, -938.33030278))
            Line((-91.419887077, -938.33030278), (-91.419887077, -949.035688293))
        make_face()
        with BuildLine():
            Line((-86.415652438, -944.340511931), (-86.414971961, -944.745954498))
            ThreePointArc((-86.414971961, -944.745954498), (-86.419880739, -944.543240882), (-86.415652438, -944.340511931))
        make_face(mode=Mode.SUBTRACT)
        with Locations((-81.919887077, -944.535688293)):
            Circle(BOSS_EXTRUDE5_OUTLINE_R, mode=Mode.SUBTRACT)
    extrude(amount=BOSS_EXTRUDE5_DEPTH)

    # Sketch13 → Cut-Extrude4 (cut, two sides: drawn at the far end of the back side and taken through both)
    with BuildSketch(Plane.XY.offset(-CUT_EXTRUDE4_DEPTH_BACK)):
        Polygon((79.656129504, -990), (85.376212354, -990), (85.376212354, -1000), (93.919887077, -1000), (93.919887077, -990), (125.759643806, -990), (156.017038922, -946.409946928), (140.844176056, -764.335592536), (-160.217366075, -779.508455402), (-87.250309621, -1000), (-63.580112923, -1000), (-63.580112923, -990), (-53.580112923, -990), align=None)
    extrude(amount=CUT_EXTRUDE4_DEPTH + CUT_EXTRUDE4_DEPTH_BACK, mode=Mode.SUBTRACT)

    # Sketch14 → Cut-Extrude5 (cut, through all)
    with BuildSketch(Plane.XY):
        with BuildLine():
            Line((-76.080112923, -1000), (-99.934841828, -976.145271096))
            Line((-99.934841828, -976.145271096), (-120.553195013, -1197.56262))
            Line((-120.553195013, -1197.56262), (143.805321598, -1261.370087687))
            Line((143.805321598, -1261.370087687), (228.336918045, -1143.906616043))
            Line((228.336918045, -1143.906616043), (164.81819016, -1009.618062681))
            Line((164.81819016, -1009.618062681), (130.094214546, -955.630748168))
            Line((130.094214546, -955.630748168), (106.419887077, -990))
            Line((106.419887077, -990), (106.419887077, -1187.56262))
            ThreePointArc((106.419887077, -1187.56262), (103.490954888, -1194.633687812), (96.419887077, -1197.56262))
            Line((96.419887077, -1197.56262), (-66.080112923, -1197.56262))
            ThreePointArc((-66.080112923, -1197.56262), (-73.151180735, -1194.633687812), (-76.080112923, -1187.56262))
            Line((-76.080112923, -1187.56262), (-76.080112923, -1000))
        make_face()
    extrude(amount=-CUT_EXTRUDE5_DEPTH, mode=Mode.SUBTRACT)


solid = part.part
